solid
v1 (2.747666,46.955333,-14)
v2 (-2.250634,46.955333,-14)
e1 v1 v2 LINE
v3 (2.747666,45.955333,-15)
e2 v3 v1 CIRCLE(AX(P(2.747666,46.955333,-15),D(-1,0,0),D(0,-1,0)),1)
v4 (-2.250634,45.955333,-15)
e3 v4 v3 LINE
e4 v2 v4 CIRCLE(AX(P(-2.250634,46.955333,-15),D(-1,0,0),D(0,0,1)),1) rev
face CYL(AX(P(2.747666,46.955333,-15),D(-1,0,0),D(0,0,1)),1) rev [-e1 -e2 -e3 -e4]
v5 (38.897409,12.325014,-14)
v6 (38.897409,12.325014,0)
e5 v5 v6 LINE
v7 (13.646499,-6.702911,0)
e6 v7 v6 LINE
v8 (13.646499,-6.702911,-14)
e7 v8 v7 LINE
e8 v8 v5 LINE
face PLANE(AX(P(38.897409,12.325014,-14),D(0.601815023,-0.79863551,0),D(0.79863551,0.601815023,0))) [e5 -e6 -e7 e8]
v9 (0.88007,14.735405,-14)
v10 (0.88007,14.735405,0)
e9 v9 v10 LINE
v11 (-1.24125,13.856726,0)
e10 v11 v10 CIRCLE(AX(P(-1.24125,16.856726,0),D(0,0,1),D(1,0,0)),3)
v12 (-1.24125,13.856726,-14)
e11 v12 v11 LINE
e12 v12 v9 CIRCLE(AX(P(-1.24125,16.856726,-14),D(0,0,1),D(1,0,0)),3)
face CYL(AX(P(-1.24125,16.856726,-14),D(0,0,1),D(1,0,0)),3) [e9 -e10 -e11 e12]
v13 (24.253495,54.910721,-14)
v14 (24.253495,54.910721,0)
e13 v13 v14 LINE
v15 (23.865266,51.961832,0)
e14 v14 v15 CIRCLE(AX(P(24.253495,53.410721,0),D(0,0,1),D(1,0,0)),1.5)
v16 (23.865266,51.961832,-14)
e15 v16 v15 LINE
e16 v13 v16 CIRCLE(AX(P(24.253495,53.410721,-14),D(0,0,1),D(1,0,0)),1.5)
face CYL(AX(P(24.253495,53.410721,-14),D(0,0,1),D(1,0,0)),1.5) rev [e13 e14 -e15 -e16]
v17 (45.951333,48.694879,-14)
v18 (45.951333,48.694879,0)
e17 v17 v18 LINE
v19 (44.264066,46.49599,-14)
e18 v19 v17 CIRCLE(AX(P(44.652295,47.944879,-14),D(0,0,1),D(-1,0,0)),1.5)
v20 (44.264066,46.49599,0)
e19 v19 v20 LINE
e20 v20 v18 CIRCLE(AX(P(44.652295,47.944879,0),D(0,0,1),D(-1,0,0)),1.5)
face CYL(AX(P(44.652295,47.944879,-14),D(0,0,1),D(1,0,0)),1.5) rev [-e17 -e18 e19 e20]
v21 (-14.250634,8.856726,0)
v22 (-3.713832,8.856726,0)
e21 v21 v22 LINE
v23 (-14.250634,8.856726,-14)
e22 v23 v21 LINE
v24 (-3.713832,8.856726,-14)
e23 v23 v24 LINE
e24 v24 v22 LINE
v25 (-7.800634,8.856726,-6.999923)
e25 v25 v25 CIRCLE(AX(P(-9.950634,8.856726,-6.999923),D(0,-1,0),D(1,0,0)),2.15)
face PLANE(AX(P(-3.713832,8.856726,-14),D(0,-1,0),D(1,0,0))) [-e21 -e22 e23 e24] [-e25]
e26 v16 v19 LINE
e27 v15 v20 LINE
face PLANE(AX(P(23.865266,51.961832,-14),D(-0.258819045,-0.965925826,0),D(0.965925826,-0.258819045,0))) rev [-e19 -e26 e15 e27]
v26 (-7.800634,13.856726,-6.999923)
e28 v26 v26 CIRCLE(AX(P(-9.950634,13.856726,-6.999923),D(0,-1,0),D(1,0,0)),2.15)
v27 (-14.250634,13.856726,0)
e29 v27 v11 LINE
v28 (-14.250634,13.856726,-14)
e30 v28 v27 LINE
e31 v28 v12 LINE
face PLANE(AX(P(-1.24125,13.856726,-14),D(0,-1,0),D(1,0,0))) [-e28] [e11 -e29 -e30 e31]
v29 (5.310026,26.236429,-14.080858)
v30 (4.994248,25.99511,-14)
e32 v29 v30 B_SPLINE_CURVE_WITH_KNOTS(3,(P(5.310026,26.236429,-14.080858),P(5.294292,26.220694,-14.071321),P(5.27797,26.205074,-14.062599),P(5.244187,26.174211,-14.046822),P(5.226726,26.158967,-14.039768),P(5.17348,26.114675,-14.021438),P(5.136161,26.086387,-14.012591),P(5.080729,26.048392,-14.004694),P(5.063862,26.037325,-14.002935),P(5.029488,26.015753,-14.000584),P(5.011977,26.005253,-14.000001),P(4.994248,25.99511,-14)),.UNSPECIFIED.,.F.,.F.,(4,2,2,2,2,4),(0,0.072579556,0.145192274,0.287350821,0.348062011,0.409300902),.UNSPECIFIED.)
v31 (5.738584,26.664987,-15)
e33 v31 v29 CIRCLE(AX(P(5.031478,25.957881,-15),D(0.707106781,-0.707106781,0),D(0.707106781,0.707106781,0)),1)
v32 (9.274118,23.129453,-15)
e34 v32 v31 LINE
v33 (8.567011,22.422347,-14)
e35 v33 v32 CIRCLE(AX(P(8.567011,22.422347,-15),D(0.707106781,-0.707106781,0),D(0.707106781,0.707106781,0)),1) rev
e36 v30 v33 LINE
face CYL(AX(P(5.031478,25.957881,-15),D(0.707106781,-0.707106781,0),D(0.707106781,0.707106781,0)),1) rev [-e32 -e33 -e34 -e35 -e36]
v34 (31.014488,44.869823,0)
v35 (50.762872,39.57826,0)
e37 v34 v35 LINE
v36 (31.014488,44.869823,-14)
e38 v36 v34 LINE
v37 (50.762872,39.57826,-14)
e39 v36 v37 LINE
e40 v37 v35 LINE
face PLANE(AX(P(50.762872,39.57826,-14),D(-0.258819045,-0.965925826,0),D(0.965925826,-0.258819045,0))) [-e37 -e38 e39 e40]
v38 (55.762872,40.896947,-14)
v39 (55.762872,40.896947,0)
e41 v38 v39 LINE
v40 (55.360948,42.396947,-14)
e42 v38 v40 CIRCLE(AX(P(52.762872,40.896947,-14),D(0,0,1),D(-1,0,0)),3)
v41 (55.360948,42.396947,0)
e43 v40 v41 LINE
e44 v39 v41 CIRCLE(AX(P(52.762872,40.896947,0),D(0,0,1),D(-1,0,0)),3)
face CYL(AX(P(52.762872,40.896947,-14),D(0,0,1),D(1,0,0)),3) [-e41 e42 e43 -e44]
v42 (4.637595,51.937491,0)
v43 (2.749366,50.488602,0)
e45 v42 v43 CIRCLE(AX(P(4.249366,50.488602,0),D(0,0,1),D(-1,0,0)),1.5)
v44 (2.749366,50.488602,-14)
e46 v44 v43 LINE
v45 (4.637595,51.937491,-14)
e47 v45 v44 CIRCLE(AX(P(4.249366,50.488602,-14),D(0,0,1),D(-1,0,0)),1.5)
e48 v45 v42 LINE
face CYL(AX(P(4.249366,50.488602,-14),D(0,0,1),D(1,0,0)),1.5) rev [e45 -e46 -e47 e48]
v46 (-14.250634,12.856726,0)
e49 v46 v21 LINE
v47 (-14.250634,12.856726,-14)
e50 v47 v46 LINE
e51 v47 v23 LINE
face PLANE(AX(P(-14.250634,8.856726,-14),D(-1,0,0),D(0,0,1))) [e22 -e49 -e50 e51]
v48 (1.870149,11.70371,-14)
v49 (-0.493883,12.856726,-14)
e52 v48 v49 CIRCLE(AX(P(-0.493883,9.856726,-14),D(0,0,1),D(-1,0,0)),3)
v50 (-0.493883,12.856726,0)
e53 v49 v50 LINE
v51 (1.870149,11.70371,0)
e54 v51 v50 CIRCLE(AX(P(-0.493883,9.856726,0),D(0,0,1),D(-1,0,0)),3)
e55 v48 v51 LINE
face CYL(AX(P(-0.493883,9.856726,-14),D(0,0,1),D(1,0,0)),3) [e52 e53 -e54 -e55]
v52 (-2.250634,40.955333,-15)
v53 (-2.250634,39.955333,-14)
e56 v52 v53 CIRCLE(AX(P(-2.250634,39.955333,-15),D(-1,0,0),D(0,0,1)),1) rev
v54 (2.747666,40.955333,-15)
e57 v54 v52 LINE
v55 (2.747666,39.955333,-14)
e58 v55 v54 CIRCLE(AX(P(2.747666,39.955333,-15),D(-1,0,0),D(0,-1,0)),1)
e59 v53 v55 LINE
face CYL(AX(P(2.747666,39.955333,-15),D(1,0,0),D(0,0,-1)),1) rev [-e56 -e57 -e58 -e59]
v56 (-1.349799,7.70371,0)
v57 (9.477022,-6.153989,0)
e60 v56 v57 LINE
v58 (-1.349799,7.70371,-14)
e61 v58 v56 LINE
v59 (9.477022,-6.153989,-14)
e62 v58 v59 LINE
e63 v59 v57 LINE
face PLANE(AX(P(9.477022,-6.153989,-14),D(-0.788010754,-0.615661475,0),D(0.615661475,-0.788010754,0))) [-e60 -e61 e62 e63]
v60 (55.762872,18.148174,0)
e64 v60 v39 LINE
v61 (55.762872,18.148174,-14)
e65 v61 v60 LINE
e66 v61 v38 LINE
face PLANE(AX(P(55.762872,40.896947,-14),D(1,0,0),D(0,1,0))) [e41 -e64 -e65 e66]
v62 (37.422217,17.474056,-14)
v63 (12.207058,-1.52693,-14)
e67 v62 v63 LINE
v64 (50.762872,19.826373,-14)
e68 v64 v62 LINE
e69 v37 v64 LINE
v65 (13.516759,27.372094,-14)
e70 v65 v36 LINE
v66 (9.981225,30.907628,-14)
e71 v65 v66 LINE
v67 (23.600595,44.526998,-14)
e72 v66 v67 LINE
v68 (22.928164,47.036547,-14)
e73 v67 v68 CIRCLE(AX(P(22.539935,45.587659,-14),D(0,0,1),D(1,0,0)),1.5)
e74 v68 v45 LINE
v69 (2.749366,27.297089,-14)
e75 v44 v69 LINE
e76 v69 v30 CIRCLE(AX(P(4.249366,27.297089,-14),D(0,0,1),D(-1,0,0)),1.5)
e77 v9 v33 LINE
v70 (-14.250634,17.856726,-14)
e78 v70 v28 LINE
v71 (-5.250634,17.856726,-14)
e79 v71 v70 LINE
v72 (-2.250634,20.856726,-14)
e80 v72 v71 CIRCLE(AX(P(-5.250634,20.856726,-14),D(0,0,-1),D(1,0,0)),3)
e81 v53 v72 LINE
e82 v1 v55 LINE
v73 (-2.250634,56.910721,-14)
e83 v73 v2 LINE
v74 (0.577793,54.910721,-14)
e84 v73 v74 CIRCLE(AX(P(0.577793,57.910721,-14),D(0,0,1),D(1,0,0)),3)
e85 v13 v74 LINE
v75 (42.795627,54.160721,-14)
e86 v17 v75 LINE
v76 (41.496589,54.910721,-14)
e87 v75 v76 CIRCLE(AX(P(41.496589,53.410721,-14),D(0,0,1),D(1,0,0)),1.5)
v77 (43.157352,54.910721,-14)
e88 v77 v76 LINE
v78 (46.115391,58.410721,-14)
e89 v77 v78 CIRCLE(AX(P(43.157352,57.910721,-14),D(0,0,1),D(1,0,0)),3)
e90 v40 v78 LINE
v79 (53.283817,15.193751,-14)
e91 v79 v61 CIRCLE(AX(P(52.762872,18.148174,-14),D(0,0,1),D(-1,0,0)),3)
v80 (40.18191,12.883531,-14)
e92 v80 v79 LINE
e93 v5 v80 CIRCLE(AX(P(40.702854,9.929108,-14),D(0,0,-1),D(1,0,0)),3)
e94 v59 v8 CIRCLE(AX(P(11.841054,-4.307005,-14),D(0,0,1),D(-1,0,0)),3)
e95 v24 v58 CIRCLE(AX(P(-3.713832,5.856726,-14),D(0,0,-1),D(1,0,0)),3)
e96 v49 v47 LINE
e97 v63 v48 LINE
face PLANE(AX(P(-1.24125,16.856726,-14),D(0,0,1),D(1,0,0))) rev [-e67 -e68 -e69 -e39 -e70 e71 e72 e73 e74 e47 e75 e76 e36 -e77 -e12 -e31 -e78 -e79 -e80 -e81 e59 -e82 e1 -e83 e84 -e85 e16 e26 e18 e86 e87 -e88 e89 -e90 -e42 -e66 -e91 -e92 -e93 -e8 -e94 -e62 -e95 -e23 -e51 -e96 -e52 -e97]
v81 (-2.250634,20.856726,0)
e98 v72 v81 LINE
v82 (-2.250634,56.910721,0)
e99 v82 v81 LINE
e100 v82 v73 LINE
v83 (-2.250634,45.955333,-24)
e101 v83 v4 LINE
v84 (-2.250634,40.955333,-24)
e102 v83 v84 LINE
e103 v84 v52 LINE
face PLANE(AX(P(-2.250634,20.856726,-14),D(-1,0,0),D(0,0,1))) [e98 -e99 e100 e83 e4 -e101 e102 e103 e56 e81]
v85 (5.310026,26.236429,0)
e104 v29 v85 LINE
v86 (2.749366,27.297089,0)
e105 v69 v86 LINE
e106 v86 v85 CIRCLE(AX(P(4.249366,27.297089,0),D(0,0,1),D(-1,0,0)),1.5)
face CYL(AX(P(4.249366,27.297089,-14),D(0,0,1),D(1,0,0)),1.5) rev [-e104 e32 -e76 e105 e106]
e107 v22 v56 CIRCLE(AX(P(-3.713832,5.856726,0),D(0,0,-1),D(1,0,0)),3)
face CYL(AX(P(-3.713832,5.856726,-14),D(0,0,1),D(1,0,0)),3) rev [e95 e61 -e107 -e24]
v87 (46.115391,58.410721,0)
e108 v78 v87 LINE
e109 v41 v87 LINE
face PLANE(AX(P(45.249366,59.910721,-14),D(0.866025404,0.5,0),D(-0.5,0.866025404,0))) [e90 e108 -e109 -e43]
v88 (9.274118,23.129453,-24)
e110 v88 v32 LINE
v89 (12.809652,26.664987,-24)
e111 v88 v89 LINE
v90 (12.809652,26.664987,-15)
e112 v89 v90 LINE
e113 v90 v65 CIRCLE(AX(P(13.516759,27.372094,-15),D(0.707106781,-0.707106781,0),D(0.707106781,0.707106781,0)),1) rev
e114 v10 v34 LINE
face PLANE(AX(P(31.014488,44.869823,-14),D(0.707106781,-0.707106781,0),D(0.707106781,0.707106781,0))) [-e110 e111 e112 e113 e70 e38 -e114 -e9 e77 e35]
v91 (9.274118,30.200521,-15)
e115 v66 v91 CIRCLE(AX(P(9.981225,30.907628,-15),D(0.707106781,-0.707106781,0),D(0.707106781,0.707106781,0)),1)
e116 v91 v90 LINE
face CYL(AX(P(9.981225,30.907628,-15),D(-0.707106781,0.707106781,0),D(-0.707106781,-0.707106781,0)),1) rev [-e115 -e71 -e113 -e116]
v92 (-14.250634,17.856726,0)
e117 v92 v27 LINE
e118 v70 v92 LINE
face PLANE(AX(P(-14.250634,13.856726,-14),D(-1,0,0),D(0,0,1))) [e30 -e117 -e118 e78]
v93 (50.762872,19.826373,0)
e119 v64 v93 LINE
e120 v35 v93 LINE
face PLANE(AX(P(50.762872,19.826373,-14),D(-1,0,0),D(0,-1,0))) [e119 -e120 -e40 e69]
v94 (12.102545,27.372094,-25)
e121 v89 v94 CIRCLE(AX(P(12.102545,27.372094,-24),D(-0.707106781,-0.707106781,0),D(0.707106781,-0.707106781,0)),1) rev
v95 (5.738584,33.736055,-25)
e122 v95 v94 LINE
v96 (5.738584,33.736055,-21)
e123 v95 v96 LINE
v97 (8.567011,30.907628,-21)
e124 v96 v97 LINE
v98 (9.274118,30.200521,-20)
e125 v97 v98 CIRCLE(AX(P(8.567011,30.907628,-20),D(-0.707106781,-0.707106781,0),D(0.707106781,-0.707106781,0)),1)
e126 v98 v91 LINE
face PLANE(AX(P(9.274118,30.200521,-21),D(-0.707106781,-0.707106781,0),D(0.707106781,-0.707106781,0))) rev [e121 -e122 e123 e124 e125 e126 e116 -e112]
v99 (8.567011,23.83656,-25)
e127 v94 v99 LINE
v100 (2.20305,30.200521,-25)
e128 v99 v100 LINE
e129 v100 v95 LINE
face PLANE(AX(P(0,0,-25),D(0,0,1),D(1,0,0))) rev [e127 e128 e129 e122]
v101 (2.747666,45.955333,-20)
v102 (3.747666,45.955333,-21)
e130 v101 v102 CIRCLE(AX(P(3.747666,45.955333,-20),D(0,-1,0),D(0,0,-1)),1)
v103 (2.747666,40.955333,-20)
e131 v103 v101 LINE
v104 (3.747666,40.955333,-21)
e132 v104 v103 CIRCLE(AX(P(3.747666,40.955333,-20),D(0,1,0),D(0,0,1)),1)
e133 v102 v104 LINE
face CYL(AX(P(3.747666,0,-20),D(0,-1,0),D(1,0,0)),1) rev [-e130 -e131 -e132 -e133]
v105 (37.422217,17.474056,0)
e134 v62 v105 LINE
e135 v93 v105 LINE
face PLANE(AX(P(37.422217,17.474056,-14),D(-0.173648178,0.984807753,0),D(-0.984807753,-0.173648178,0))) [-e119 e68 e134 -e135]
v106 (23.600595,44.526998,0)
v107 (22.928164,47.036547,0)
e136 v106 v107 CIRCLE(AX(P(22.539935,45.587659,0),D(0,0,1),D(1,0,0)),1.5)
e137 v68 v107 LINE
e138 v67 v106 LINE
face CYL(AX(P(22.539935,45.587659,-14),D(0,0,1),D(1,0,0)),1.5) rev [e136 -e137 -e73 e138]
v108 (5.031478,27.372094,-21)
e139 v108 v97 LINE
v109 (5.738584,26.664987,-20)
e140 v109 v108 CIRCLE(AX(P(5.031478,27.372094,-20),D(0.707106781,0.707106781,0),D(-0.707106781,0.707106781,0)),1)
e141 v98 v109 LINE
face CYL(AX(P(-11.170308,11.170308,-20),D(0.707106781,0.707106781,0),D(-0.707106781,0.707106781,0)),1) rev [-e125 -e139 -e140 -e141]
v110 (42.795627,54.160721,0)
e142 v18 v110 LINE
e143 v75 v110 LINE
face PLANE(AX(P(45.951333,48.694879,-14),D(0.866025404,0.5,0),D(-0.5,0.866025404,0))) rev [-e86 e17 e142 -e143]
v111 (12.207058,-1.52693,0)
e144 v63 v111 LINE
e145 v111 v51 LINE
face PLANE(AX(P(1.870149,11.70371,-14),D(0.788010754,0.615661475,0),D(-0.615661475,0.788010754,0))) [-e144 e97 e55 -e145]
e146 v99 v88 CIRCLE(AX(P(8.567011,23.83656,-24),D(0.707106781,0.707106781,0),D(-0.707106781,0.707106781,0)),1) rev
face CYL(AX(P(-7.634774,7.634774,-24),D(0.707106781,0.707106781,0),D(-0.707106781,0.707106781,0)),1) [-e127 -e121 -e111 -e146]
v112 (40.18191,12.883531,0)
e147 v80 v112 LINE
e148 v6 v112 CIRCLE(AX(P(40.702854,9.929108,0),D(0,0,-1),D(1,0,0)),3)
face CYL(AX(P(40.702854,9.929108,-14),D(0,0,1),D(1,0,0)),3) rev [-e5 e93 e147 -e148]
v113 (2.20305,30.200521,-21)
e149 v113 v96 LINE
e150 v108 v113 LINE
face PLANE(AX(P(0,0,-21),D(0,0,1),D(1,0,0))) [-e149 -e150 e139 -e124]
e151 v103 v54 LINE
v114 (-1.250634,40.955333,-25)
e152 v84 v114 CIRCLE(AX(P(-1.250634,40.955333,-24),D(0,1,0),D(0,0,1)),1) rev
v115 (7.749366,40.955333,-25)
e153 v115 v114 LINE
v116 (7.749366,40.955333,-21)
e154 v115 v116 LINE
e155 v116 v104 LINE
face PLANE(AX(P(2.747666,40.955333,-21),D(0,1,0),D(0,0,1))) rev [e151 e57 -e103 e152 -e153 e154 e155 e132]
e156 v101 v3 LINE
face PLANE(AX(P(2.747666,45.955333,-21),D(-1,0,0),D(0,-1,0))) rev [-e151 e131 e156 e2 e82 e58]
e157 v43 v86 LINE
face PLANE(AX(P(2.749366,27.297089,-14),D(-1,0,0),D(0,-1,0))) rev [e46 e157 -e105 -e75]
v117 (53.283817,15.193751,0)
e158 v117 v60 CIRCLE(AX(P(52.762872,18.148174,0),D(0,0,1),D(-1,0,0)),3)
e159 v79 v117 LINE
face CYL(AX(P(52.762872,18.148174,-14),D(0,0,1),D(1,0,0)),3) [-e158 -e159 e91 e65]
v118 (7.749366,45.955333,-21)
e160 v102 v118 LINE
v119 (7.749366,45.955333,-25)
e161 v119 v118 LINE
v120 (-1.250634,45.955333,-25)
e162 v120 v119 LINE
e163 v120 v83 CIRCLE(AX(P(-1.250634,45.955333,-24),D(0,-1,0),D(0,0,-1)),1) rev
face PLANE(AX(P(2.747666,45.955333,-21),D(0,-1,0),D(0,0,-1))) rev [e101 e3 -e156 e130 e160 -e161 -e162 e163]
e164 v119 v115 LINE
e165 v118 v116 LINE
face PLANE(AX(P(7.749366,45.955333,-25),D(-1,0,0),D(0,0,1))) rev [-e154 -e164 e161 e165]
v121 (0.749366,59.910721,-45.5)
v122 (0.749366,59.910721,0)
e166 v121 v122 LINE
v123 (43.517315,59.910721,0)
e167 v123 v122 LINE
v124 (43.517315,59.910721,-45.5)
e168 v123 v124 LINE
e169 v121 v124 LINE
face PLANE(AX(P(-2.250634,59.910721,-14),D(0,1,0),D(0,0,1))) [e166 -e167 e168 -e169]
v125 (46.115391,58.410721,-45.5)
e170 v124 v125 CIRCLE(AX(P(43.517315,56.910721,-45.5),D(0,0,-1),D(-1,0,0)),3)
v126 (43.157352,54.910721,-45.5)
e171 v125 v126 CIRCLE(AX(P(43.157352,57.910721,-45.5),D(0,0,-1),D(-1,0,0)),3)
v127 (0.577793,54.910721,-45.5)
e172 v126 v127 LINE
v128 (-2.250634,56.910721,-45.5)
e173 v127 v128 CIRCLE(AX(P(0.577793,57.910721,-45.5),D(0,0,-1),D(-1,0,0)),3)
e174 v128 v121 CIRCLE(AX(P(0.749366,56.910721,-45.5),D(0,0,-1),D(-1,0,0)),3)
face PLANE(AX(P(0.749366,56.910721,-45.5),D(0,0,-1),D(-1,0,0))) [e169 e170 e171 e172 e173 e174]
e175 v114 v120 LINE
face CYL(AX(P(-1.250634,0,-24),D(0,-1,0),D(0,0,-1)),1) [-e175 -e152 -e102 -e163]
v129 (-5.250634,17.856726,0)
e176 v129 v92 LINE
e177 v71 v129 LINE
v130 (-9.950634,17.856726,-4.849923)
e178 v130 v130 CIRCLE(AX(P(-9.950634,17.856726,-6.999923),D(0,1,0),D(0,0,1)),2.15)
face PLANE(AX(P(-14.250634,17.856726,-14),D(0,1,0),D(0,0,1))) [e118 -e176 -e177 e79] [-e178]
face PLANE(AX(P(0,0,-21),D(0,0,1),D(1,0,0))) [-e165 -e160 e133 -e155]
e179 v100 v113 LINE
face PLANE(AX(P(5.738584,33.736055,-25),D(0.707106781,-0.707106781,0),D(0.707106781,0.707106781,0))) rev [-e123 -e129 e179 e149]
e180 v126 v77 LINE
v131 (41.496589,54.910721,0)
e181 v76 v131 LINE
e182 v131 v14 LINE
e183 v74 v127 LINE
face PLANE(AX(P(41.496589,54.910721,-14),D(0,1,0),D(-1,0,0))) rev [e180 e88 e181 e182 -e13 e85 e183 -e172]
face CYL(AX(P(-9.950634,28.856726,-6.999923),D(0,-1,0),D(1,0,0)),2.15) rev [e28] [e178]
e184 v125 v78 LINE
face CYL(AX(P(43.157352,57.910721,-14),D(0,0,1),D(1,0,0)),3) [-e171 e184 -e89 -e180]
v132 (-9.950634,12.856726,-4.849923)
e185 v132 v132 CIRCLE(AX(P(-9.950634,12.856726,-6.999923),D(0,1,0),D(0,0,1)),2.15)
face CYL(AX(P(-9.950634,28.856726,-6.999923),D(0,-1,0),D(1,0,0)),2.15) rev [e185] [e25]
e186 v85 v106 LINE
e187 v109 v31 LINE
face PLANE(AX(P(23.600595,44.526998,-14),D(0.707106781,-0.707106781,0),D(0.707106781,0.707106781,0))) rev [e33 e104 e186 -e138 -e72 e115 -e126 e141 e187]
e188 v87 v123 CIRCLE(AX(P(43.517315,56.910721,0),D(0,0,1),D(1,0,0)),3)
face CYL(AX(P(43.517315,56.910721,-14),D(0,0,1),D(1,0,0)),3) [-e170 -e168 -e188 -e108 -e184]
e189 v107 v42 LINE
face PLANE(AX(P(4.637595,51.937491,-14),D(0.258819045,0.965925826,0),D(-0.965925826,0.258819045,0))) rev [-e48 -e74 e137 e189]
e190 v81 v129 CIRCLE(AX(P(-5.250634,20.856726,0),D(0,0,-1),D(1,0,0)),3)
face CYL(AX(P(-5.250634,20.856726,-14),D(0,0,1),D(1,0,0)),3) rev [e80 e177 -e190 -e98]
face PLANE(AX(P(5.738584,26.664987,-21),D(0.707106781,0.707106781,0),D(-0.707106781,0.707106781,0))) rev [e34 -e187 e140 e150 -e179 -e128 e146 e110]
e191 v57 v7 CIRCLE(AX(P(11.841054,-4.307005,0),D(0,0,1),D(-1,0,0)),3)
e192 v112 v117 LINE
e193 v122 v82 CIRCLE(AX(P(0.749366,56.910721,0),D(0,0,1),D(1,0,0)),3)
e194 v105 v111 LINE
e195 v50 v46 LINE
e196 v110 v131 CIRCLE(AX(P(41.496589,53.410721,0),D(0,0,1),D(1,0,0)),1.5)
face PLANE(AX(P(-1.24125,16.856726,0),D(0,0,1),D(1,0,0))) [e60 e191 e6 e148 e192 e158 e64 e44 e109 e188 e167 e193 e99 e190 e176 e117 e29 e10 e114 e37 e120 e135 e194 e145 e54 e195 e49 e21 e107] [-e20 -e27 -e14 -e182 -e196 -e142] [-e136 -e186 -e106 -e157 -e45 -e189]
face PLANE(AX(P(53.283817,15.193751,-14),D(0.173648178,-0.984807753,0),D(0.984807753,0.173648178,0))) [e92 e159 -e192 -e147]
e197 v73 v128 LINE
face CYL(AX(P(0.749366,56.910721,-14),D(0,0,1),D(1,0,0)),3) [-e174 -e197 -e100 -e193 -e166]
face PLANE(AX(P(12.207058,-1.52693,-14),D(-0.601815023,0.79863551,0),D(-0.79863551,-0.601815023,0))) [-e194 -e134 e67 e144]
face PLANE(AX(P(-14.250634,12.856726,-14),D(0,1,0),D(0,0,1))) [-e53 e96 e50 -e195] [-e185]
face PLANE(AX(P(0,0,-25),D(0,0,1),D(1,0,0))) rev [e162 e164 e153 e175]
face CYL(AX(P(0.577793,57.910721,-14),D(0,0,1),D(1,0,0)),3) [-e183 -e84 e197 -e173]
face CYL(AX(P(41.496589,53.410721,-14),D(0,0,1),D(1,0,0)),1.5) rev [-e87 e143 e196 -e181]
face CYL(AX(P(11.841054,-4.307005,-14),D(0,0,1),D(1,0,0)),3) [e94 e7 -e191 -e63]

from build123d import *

# Parameters (mm, degrees)
BOSS_EXTRUDE1_DEPTH = 14
FILLET1_R           = 3
SKETCH2_R           = 2.149999998
CUT_EXTRUDE1_DEPTH  = 20
BOSS_EXTRUDE2_START = 31.5
BOSS_EXTRUDE2_DEPTH = 31.5
FILLET2_R           = 3
SKETCH4_W           = 4.998300131
SKETCH4_H           = 5
BOSS_EXTRUDE3_DEPTH = 7
SKETCH5_W           = 10
SKETCH5_H           = 5
BOSS_EXTRUDE4_DEPTH = 4
FILLET3_R           = 1


with BuildPart() as part:
    # Sketch1 → Boss-Extrude1 (new body)
    with BuildSketch(Plane.XY):
        with BuildLine():
            Line((-1.241250307, 13.85672555), (-14.250633986, 13.85672555))
            Line((-14.250633986, 13.85672555), (-14.250633986, 17.85672555))
            Line((-14.250633986, 17.85672555), (-5.250633986, 17.85672555))
            ThreePointArc((-5.250633986, 17.85672555), (-3.129313642, 18.735405207), (-2.250633986, 20.85672555))
            Line((-2.250633986, 20.85672555), (-2.250633986, 59.910721228))
            Line((-2.250633986, 59.910721228), (-0.250633986, 59.910721228))
            Line((-0.250633986, 59.910721228), (45.249366014, 59.910721228))
            Line((45.249366014, 59.910721228), (55.360948415, 42.396946765))
            ThreePointArc((55.360948415, 42.396946765), (55.660649682, 41.673403901), (55.762872203, 40.896946765))
            Line((55.762872203, 40.896946765), (55.762872203, 18.148173952))
            ThreePointArc((55.762872203, 18.148173952), (55.061005533, 16.219811123), (53.283816736, 15.193750693))
            Line((53.283816736, 15.193750693), (40.181909711, 12.883530985))
            ThreePointArc((40.181909711, 12.883530985), (39.506607037, 12.680287949), (38.897409174, 12.325014256))
            Line((38.897409174, 12.325014256), (13.646499049, -6.702911338))
            ThreePointArc((13.646499049, -6.702911338), (11.449475402, -7.281339392), (9.477021718, -6.153989234))
            Line((9.477021718, -6.153989234), (-1.349799491, 7.703709976))
            ThreePointArc((-1.349799491, 7.703709976), (-2.398718311, 8.553107689), (-3.713831752, 8.85672555))
            Line((-3.713831752, 8.85672555), (-14.250633986, 8.85672555))
            Line((-14.250633986, 8.85672555), (-14.250633986, 12.85672555))
            Line((-14.250633986, 12.85672555), (-3.093333978, 12.85672555))
            Line((-3.093333978, 12.85672555), (-0.493883182, 12.85672555))
            ThreePointArc((-0.493883182, 12.85672555), (0.821230258, 12.553107689), (1.870149079, 11.703709976))
            Line((1.870149079, 11.703709976), (12.207057793, -1.526929835))
            Line((12.207057793, -1.526929835), (37.422217436, 17.474055838))
            Line((37.422217436, 17.474055838), (50.762872203, 19.826373214))
            Line((50.762872203, 19.826373214), (50.762872203, 39.578259723))
            Line((50.762872203, 39.578259723), (31.01448812, 44.86982329))
            Line((31.01448812, 44.86982329), (15.607892966, 29.463228136))
            Line((15.607892966, 29.463228136), (0.880070037, 14.735405207))
            ThreePointArc((0.880070037, 14.735405207), (-0.09320001, 14.085086953), (-1.241250307, 13.85672555))
        make_face()
        with BuildLine():
            Line((45.951332722, 48.694879226), (42.79562737, 54.160721228))
            ThreePointArc((42.79562737, 54.160721228), (42.246589264, 54.709759334), (41.496589264, 54.910721228))
            Line((41.496589264, 54.910721228), (24.253494556, 54.910721228))
            ThreePointArc((24.253494556, 54.910721228), (22.766327264, 53.606510517), (23.865265988, 51.961832489))
            Line((23.865265988, 51.961832489), (44.264066048, 46.495990486))
            ThreePointArc((44.264066048, 46.495990486), (45.842324626, 47.031737082), (45.951332722, 48.694879226))
        make_face(mode=Mode.SUBTRACT)
        with BuildLine():
            Line((23.600595455, 44.526998437), (5.310026186, 26.236429168))
            ThreePointArc((5.310026186, 26.236429168), (3.675340866, 25.911270041), (2.749366014, 27.29708934))
            Line((2.749366014, 27.29708934), (2.749366014, 50.488601873))
            ThreePointArc((2.749366014, 50.488601873), (3.336223871, 51.678631883), (4.637594582, 51.937490612))
            Line((4.637594582, 51.937490612), (22.92816385, 47.036547348))
            ThreePointArc((22.92816385, 47.036547348), (23.988824022, 45.975887176), (23.600595455, 44.526998437))
        make_face(mode=Mode.SUBTRACT)
    extrude(amount=-BOSS_EXTRUDE1_DEPTH)

    # Fillet1
    fillet1_edges = [part.edges().sort_by_distance(p)[0] for p in [
        (-2.250633986, 59.910721228, -7),
        (45.249366014, 59.910721228, -7),
    ]]
    fillet(fillet1_edges, radius=FILLET1_R)

    # Sketch2 → Cut-Extrude1 (cut)
    with BuildSketch(Plane.XZ.offset(-8.85672555)):
        with Locations((-9.950633986, -6.999923237)):
            Circle(SKETCH2_R)
    extrude(amount=-CUT_EXTRUDE1_DEPTH, mode=Mode.SUBTRACT)

    # Sketch3 → Boss-Extrude2 (add)
    with BuildSketch(Plane(origin=(0, 0, -14), x_dir=(-1, 0, 0), z_dir=(0, 0, -1)).offset(BOSS_EXTRUDE2_START)):
        with BuildLine():
            Line((-43.517315207, 59.910721228), (-0.749366014, 59.910721228))
            ThreePointArc((-0.749366014, 59.910721228), (1.371954329, 59.032041572), (2.250633986, 56.910721228))
            Line((2.250633986, 56.910721228), (2.250633986, 54.910721228))
            Line((2.250633986, 54.910721228), (-48.13611736, 54.910721228))
            Line((-48.13611736, 54.910721228), (-46.115391418, 58.410721228))
            ThreePointArc((-46.115391418, 58.410721228), (-45.017315207, 59.50879744), (-43.517315207, 59.910721228))
        make_face()
    extrude(amount=-BOSS_EXTRUDE2_DEPTH)

    # Fillet2
    # the kernel refuses this fillet: 3 mm, written as the material it takes off along each edge
    with BuildSketch(Plane(origin=(-2.250633986, 54.910721228, -52.571067812), x_dir=(0, 1, 0), z_dir=(0, 0, 1))) as fillet2_piece_1:
        with BuildLine():
            CenterArc((3, -2.828427125), FILLET2_R, 109.471220634, 70.528779366)
            Line((0, -2.828427125), (-0.06, -2.828427125))
            Line((-0.06, -2.828427125), (-0.06, 0))
            Line((-0.06, 0), (0, 0.06))
            ThreePointArc((0, 0.06), (1, 0.06), (1.98, 0.056568542))
            Line((1.98, 0.056568542), (2, 0))
        make_face()
    extrude(amount=38.571067812, mode=Mode.SUBTRACT)
    with BuildSketch(Plane(origin=(48.13611736, 54.910721228, -57.946914584), x_dir=(-1, 0, 0), z_dir=(0, 0, 1))) as fillet2_piece_2:
        with BuildLine():
            CenterArc((4.978765834, -3), FILLET2_R, 90, 99.594068227)
            Line((2.020725942, -3.5), (1.961565144, -3.51))
            ThreePointArc((1.961565144, -3.51), (0.958401447, -1.78), (-0.051961524, -0.03))
            Line((-0.051961524, -0.03), (0, 0.06))
            Line((0, 0.06), (4.978765834, 0.06))
            Line((4.978765834, 0.06), (4.978765834, 0))
        make_face()
    extrude(amount=43.946914584, mode=Mode.SUBTRACT)

    # Sketch4 → Boss-Extrude3 (add)
    with BuildSketch(Plane(origin=(0, 0, -14), x_dir=(-1, 0, 0), z_dir=(0, 0, -1))):
        with Locations((-0.24851608, 43.455333299)):
            Rectangle(SKETCH4_W, SKETCH4_H)
        Polygon((-9.274118244, 30.200521226), (-5.738584338, 26.66498732), (-9.274118244, 23.129453414), (-12.80965215, 26.66498732), align=None)
    extrude(amount=BOSS_EXTRUDE3_DEPTH)

    # Sketch5 → Boss-Extrude4 (add)
    with BuildSketch(Plane(origin=(0, 0, -21), x_dir=(-1, 0, 0), z_dir=(0, 0, -1))):
        Polygon((-12.80965215, 26.66498732), (-9.274118244, 23.129453414), (-2.203050432, 30.200521226), (-5.738584338, 33.736055132), align=None)
        with Locations((-2.749366014, 43.455333299)):
            Rectangle(SKETCH5_W, SKETCH5_H)
    extrude(amount=BOSS_EXTRUDE4_DEPTH)

    # Fillet3
    fillet3_edges = [part.edges().sort_by_distance(p)[0] for p in [
        (0.248516079, 40.955333299, -14),
        (0.248516079, 45.955333299, -14),
        (2.747666145, 43.455333299, -21),
        (11.041885197, 28.432754273, -14),
        (7.506351291, 24.897220367, -14),
        (7.506351291, 28.432754273, -21),
        (-2.250633986, 43.455333299, -25),
        (11.041885197, 24.897220367, -25),
    ]]
    fillet(fillet3_edges, radius=FILLET3_R)


solid = part.part
